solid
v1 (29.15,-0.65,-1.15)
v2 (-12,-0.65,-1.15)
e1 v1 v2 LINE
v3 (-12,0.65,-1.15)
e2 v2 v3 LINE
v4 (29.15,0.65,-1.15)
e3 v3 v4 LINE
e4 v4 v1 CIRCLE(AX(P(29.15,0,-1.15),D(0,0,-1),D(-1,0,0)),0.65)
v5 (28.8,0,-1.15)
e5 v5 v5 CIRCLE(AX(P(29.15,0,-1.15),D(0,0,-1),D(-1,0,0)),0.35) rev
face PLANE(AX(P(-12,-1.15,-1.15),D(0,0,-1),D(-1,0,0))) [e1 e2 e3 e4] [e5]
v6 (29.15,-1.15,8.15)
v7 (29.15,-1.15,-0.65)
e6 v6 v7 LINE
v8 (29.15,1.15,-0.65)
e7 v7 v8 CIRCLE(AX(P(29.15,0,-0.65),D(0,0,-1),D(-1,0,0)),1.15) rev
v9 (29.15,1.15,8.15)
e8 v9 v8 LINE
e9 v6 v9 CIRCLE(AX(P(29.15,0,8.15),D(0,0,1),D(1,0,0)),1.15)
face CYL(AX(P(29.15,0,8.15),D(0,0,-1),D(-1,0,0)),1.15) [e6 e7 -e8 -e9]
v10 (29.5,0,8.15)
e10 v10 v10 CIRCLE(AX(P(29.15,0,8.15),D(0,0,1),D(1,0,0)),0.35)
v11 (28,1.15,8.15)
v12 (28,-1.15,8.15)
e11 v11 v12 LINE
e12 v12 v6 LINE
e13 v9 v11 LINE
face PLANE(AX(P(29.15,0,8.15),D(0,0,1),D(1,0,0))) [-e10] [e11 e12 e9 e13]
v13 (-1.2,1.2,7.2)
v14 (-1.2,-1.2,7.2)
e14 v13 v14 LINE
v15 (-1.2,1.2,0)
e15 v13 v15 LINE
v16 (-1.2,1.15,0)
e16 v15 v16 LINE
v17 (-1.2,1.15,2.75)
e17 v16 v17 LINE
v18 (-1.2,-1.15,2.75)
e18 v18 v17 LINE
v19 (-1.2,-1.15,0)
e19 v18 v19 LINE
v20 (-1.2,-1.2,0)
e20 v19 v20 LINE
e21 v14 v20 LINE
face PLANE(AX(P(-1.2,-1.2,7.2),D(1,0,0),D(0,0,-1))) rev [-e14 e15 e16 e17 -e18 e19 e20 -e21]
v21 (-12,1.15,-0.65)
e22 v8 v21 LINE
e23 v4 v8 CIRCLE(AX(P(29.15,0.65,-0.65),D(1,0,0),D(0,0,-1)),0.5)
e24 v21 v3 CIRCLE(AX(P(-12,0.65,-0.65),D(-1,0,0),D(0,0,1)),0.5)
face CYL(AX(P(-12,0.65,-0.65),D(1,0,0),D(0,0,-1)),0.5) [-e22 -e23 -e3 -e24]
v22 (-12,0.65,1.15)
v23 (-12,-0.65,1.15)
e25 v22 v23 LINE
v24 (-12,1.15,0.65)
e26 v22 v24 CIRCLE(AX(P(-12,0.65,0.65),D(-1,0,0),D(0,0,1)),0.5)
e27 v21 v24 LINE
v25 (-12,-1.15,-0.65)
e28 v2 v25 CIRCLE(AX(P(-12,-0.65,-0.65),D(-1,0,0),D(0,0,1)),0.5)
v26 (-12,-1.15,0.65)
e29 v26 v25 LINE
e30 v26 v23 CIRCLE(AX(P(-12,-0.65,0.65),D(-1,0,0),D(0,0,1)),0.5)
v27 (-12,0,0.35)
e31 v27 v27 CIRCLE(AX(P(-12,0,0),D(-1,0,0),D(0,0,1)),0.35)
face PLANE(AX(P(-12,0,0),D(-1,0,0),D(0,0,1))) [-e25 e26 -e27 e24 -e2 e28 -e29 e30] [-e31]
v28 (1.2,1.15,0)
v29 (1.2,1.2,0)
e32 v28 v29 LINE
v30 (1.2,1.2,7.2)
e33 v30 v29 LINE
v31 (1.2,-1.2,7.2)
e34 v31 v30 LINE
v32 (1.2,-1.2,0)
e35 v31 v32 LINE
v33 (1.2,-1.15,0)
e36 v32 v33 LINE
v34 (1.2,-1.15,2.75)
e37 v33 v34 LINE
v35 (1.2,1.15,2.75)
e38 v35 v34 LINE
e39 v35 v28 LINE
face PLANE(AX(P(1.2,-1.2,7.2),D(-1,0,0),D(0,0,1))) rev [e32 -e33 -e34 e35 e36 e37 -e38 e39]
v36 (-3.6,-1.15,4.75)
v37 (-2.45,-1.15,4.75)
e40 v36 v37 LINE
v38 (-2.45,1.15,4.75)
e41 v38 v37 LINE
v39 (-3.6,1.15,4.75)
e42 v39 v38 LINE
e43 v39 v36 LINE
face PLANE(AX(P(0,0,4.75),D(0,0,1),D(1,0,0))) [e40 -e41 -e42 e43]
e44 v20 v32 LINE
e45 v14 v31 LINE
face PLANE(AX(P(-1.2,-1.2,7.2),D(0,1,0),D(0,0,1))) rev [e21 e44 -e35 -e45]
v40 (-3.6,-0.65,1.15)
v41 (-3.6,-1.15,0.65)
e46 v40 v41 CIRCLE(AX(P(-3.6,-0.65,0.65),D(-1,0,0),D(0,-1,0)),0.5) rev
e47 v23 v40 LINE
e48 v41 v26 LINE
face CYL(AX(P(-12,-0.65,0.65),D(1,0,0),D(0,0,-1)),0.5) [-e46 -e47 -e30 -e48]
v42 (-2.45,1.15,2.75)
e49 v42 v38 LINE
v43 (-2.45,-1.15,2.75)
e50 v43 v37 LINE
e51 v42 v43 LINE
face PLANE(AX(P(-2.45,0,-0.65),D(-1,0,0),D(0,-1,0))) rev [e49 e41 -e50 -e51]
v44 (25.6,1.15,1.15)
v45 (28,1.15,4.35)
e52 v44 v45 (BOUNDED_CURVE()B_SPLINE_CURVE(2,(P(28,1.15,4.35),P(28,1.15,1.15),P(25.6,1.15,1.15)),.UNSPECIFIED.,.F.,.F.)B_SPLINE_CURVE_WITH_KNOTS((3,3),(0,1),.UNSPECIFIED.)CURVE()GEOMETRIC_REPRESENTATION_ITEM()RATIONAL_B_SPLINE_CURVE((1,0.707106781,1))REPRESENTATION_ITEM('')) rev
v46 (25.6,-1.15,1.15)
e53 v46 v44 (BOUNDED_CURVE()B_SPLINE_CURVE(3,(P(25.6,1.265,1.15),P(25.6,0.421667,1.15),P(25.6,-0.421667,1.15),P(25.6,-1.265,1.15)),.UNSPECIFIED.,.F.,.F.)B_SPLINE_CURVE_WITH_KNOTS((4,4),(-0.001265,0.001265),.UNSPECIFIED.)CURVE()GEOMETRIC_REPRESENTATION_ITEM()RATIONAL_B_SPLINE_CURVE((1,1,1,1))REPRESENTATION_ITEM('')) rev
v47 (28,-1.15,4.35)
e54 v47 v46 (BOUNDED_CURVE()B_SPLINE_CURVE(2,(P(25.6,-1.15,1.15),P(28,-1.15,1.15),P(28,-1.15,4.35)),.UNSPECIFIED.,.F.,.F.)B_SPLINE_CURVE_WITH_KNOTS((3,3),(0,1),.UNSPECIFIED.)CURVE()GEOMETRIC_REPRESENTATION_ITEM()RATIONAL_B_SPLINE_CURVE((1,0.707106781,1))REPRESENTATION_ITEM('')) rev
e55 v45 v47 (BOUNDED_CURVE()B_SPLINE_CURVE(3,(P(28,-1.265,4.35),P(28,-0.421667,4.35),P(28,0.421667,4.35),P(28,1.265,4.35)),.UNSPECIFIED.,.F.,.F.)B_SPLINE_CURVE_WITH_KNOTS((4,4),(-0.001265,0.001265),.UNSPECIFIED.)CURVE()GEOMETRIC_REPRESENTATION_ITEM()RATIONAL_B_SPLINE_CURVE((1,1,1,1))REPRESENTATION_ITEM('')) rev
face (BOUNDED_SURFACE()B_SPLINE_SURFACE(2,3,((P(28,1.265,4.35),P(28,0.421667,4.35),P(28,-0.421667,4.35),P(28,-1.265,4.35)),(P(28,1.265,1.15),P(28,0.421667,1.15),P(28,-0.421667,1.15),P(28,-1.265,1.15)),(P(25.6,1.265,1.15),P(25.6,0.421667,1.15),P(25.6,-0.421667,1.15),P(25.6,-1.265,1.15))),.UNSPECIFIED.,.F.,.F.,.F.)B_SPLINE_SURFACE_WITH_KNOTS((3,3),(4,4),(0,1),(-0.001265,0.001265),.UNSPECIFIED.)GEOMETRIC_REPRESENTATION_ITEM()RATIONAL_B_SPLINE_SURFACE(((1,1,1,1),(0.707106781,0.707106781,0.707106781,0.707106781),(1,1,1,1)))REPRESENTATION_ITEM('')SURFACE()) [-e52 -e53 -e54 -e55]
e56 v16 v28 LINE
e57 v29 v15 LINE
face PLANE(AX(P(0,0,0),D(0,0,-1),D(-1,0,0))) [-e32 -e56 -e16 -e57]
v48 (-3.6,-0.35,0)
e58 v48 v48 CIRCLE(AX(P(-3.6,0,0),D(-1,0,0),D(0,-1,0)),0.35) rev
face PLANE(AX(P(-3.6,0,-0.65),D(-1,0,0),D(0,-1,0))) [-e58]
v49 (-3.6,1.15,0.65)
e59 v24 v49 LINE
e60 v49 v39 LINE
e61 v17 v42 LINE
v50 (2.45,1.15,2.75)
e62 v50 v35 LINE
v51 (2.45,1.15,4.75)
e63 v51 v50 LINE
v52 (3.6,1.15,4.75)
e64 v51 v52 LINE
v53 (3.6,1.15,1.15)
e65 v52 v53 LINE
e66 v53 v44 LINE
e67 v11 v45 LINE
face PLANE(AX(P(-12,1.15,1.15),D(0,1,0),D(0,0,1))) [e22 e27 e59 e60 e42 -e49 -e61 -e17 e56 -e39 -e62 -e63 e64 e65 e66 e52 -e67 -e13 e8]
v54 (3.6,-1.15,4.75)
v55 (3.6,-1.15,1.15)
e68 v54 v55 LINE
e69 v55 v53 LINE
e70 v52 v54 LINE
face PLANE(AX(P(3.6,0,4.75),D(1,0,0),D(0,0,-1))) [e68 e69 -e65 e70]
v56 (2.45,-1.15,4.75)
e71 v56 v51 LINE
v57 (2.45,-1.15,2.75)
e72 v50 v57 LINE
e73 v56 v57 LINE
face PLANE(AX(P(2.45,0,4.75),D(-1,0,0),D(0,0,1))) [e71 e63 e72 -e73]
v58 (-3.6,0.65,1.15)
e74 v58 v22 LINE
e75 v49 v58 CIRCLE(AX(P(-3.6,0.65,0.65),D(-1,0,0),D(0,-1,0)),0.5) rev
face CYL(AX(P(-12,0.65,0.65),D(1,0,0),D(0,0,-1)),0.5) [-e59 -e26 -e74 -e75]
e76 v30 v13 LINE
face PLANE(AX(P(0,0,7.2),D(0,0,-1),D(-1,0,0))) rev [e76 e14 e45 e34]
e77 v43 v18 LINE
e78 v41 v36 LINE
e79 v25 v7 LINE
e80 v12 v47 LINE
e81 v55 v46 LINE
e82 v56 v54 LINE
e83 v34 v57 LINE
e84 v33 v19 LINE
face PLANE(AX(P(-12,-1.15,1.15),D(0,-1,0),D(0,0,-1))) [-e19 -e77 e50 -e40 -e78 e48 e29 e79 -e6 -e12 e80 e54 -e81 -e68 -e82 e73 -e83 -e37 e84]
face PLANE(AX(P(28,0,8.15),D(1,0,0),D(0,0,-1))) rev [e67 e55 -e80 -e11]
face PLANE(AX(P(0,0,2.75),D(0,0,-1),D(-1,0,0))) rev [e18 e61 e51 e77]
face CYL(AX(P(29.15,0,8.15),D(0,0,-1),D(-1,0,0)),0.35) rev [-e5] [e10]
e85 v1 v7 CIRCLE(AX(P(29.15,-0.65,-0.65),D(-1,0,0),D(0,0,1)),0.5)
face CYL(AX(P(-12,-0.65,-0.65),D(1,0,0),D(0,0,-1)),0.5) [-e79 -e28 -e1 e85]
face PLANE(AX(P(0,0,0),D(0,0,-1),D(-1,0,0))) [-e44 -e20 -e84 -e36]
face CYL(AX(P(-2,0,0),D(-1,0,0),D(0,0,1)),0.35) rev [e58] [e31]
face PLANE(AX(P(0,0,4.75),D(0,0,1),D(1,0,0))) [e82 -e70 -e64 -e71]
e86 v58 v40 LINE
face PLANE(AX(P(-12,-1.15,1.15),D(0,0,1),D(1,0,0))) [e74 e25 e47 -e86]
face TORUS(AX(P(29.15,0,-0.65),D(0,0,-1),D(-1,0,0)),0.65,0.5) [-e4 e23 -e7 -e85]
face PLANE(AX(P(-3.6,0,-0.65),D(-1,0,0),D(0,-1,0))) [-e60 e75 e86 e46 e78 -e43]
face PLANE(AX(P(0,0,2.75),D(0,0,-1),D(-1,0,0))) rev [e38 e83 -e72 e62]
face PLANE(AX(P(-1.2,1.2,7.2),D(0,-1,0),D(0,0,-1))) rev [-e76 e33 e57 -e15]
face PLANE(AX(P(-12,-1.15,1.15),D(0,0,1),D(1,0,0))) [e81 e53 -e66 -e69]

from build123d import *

# Parameters (mm, degrees)
SKETCH_1_W           = 2.4
SKETCH_1_H           = 2.4
EXTRUDE_1_DEPTH      = 7.2
EXTRUDE_2_DEPTH      = 28
EXTRUDE_2_DEPTH_BACK = 12
SKETCH_4_W           = 2.3
SKETCH_4_H           = 2.3
EXTRUDE_3_DEPTH      = 7
EXTRUDE_3_DEPTH_BACK = 2.3
SKETCH_5_R           = 0.35
SKETCH_6_R           = 0.35
CUT_EXTRUDE_1_DEPTH  = 10
FILLET_1_SIZE        = 2.4
FILLET_1_SIZE_2      = 3.2
FILLET_2_R           = 0.5
EXTRUDE_START        = -1.5
SKETCH_7_W           = 1.15
SKETCH_7_H           = 0.5
SKETCH_7_H_2         = 1.3
SKETCH_7_H_3         = 2.3
EXTRUDE_4_DEPTH      = 5.1
SKETCH_8_W           = 7.2
SKETCH_8_H           = 2.3
EXTRUDE_5_DEPTH      = 3.1


with BuildPart() as part:
    # 草图1 → 凸台-拉伸1 (new body)
    with BuildSketch(Plane.XY):
        Rectangle(SKETCH_1_W, SKETCH_1_H)
    extrude(amount=EXTRUDE_1_DEPTH)

    # 草图4 → 凸台-拉伸2 (add, two sides: drawn at the far end of the back side and taken through both)
    with BuildSketch(Plane(origin=(0, 0, 0), x_dir=(0, 0, -1), z_dir=(1, 0, 0)).offset(-EXTRUDE_2_DEPTH_BACK)):
        Rectangle(SKETCH_4_W, SKETCH_4_H)
    extrude(amount=EXTRUDE_2_DEPTH + EXTRUDE_2_DEPTH_BACK)

    # 草图5 → 凸台-拉伸3 (add, two sides: drawn at the far end of the back side and taken through both)
    with BuildSketch(Plane.XY.offset(1.15).offset(-EXTRUDE_3_DEPTH_BACK)):
        with BuildLine():
            Line((28, 0), (28, 1.15))
            Line((28, 1.15), (29.15, 1.15))
            ThreePointArc((29.15, 1.15), (30.3, 0), (29.15, -1.15))
            Line((29.15, -1.15), (28, -1.15))
            Line((28, -1.15), (28, 0))
        make_face()
        with Locations(Location((29.15, 0, 0), (0, 0, 180))):
            Circle(SKETCH_5_R, mode=Mode.SUBTRACT)
    extrude(amount=EXTRUDE_3_DEPTH + EXTRUDE_3_DEPTH_BACK)

    # 草图6 → 切除-拉伸1 (cut)
    with BuildSketch(Plane.ZY.offset(12)):
        Circle(SKETCH_6_R)
    extrude(amount=-CUT_EXTRUDE_1_DEPTH, mode=Mode.SUBTRACT)

    # 圆角1
    # an asymmetric fillet: 3.2, 2.4 mm, written as the material it adds along each edge
    with BuildSketch(Plane(origin=(28, 1.15, 1.15), x_dir=(-1, 0, 0), z_dir=(0, -1, 0))) as fillet_1_piece_1:
        with BuildLine():
            Bezier((FILLET_1_SIZE, 0), (0, 0), (0, -FILLET_1_SIZE_2), weights=[1, 0.707106781, 1])
            Line((0, -FILLET_1_SIZE_2), (0, 0))
            Line((0, 0), (FILLET_1_SIZE, 0))
        make_face()
    extrude(amount=2.3)

    # 圆角2
    fillet_2_edges = [part.edges().sort_by_distance(p)[0] for p in [
        (-6.6, -1.15, 1.15),
        (8.575, -1.15, -1.15),
        (-6.6, 1.15, 1.15),
        (8.575, 1.15, -1.15),
        (30.3, 0, -1.15),
    ]]
    fillet(fillet_2_edges, radius=FILLET_2_R)

    # 草图7 → 凸台-拉伸4 (add)
    with BuildSketch(Plane.XY.offset(1.15).offset(EXTRUDE_START)):
        with Locations((-3.025, 0.9)):
            Rectangle(SKETCH_7_W, SKETCH_7_H)
        with Locations((-3.025, 0)):
            Rectangle(SKETCH_7_W, SKETCH_7_H_2)
        with Locations((-3.025, -0.9)):
            Rectangle(SKETCH_7_W, SKETCH_7_H)
        with Locations((3.025, 0)):
            Rectangle(SKETCH_7_W, SKETCH_7_H_3)
    extrude(amount=EXTRUDE_4_DEPTH)

    # 草图8 → 凸台-拉伸5 (add)
    with BuildSketch(Plane.XY.offset(1.15).offset(EXTRUDE_START)):
        Rectangle(SKETCH_8_W, SKETCH_8_H)
    extrude(amount=EXTRUDE_5_DEPTH)


solid = part.part
